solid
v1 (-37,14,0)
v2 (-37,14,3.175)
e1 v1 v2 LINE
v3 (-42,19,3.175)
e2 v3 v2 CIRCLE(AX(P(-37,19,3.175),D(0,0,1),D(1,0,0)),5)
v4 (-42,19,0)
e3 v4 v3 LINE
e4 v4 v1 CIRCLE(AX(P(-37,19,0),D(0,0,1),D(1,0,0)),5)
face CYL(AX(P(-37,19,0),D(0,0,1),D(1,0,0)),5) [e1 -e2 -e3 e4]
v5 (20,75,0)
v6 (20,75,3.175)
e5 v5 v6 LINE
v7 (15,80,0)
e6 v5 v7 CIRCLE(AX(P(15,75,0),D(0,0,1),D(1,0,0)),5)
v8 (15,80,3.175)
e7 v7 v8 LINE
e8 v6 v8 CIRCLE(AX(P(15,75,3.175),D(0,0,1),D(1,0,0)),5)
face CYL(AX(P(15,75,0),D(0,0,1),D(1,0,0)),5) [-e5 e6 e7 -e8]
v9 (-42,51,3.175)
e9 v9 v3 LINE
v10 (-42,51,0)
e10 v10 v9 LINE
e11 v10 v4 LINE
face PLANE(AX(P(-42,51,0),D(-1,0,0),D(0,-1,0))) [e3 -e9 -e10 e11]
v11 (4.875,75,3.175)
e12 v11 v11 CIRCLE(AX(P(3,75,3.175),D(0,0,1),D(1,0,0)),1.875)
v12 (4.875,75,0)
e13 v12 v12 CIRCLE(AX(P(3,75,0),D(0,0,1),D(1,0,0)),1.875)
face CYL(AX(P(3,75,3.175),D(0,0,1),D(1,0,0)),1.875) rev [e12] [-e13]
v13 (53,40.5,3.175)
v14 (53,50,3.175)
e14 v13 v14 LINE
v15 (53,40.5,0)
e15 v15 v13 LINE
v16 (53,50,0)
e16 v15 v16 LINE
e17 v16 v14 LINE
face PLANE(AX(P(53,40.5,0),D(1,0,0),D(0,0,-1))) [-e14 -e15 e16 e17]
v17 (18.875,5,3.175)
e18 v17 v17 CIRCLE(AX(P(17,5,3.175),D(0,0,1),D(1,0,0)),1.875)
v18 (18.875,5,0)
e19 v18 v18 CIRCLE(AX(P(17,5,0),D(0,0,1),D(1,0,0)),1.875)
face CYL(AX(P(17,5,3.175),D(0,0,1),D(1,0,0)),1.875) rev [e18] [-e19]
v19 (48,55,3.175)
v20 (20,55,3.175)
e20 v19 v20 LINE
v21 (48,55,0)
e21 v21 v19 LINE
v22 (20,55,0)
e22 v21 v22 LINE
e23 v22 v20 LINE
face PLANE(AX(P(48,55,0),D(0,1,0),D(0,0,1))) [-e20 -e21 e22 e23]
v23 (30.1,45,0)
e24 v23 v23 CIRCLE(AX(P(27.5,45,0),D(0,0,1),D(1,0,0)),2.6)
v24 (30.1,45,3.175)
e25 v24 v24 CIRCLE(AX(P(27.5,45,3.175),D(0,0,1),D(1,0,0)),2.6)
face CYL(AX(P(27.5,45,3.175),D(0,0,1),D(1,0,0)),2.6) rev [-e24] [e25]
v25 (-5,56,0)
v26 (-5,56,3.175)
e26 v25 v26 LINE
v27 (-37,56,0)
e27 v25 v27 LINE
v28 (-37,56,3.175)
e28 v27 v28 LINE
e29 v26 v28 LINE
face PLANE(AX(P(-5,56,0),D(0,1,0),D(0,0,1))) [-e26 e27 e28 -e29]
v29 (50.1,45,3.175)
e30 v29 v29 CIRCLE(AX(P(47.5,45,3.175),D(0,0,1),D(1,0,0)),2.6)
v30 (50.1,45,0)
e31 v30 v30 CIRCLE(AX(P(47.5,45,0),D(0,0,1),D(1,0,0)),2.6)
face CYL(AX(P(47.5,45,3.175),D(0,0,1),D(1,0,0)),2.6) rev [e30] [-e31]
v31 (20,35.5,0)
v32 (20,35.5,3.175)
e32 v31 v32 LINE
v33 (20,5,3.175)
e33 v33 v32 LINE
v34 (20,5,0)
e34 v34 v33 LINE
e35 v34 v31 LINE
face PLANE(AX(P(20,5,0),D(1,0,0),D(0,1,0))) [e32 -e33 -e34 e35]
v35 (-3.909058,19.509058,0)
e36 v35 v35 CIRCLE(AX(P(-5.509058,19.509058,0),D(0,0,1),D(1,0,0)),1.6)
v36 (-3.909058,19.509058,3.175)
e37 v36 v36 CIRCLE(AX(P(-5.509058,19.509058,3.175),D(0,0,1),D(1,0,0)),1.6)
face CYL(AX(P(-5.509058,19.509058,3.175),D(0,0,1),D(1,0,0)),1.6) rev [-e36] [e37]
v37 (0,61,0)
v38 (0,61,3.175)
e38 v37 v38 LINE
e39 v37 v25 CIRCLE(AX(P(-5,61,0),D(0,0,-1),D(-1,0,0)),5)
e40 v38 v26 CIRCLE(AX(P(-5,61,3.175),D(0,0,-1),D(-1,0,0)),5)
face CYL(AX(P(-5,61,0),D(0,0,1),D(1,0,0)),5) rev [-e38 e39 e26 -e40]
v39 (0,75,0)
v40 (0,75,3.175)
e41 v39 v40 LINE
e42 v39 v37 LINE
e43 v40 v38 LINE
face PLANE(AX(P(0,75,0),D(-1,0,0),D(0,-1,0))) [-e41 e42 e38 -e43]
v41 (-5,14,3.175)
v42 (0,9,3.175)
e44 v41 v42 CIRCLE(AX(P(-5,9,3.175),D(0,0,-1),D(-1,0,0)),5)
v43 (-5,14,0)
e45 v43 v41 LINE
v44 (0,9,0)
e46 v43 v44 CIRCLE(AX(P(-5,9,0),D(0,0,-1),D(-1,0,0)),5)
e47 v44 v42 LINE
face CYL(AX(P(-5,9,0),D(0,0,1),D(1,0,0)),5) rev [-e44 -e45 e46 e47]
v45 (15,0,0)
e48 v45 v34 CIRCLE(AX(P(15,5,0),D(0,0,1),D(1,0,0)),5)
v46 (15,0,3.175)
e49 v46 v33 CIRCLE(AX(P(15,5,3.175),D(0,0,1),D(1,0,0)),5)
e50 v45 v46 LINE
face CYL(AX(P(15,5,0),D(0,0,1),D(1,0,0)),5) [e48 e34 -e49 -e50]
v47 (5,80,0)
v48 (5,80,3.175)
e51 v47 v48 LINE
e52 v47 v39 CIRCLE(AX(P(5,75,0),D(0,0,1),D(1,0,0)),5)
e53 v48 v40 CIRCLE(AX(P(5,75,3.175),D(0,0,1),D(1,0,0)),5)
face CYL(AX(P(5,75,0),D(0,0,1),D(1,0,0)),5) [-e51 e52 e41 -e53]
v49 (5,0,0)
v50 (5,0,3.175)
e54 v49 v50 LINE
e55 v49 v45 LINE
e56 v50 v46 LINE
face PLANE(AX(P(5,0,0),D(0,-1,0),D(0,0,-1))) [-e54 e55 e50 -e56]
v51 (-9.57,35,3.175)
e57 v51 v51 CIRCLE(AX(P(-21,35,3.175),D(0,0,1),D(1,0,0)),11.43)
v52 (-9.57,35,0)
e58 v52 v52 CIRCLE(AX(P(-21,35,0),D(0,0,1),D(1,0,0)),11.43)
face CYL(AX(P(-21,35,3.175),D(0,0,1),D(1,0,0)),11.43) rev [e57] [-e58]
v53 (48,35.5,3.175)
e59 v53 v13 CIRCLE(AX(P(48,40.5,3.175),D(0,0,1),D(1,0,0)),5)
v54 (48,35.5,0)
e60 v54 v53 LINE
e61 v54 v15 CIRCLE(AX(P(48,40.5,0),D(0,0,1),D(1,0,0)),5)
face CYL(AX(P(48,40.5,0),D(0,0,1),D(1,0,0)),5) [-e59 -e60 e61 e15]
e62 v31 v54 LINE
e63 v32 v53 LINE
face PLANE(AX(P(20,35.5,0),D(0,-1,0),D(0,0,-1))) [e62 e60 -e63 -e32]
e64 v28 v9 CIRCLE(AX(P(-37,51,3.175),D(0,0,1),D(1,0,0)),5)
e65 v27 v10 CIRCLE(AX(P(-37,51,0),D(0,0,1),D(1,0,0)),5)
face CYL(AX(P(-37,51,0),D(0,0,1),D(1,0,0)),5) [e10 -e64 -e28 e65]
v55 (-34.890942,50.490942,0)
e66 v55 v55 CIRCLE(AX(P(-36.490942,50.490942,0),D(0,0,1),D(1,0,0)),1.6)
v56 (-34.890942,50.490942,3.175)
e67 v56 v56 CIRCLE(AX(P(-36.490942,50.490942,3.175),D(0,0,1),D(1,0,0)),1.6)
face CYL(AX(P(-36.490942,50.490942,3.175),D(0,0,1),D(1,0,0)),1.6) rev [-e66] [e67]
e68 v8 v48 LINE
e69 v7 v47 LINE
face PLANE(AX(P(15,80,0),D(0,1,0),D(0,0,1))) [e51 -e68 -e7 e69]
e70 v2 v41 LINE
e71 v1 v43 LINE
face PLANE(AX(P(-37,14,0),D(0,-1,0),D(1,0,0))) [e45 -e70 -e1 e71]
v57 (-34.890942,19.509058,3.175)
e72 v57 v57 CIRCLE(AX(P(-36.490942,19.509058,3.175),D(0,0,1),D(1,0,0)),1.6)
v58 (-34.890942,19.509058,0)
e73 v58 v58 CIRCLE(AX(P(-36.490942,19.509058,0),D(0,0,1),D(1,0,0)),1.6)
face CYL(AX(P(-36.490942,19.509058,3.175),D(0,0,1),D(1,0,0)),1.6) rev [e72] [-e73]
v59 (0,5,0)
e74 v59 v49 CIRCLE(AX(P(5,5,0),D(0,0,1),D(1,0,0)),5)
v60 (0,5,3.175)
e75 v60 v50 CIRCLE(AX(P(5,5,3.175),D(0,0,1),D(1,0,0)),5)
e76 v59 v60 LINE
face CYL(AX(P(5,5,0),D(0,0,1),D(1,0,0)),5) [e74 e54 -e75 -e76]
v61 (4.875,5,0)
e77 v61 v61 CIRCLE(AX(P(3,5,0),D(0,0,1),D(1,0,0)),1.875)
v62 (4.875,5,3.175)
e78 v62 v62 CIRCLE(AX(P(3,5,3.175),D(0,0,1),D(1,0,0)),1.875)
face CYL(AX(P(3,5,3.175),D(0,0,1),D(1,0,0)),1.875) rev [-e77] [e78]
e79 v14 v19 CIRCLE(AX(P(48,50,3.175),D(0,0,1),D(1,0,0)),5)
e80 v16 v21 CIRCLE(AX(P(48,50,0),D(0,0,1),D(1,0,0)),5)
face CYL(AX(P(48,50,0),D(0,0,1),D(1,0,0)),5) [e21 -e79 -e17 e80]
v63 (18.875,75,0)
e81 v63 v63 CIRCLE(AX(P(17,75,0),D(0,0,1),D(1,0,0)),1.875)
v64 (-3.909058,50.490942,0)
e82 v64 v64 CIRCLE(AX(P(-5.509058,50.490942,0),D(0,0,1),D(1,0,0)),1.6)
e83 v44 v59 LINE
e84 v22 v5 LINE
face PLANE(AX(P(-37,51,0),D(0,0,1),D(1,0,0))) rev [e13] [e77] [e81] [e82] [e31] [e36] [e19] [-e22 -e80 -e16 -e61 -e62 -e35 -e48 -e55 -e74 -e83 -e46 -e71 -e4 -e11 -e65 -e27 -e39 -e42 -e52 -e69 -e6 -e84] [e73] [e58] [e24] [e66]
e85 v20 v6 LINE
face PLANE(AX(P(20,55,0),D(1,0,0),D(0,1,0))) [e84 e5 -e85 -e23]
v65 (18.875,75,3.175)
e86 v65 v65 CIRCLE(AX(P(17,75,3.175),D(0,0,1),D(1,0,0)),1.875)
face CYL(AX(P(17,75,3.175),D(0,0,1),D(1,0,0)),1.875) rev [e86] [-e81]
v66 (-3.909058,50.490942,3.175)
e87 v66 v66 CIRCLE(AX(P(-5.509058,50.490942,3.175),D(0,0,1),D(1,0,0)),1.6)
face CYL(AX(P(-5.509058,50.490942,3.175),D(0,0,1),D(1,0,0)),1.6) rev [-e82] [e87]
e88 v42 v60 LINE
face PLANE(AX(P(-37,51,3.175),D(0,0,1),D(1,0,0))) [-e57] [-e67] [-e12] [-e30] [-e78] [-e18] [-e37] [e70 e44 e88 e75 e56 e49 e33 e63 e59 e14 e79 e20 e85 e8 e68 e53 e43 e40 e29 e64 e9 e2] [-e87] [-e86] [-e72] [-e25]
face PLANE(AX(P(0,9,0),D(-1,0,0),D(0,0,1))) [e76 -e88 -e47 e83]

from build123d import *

# Parameters (mm, degrees)
BASE_FLANGE1_DEPTH         = 3.175
M3_5_CLEARANCE_HOLE1_D     = 3.75
F_5_2_5_2_DIAMETER_HOLE1_D = 5.2
F_3_2_3_2_DIAMETER_HOLE1_D = 3.2
M20_CLEARANCE_HOLE1_D      = 22.86


# Sheet-metal steps are written as plain solids
with BuildPart() as part:
    # Sketch11 → Base-Flange1 (new body)
    with BuildSketch(Plane.XY.offset(3.175)):
        with BuildLine():
            Line((-42, 51), (-42, 19))
            ThreePointArc((-42, 19), (-40.535533906, 15.464466094), (-37, 14))
            Line((-37, 14), (-5, 14))
            ThreePointArc((-5, 14), (-1.464466094, 12.535533906), (0, 9))
            Line((0, 9), (0, 5))
            ThreePointArc((0, 5), (1.464466094, 1.464466094), (5, 0))
            Line((5, 0), (15, 0))
            ThreePointArc((15, 0), (18.535533906, 1.464466094), (20, 5))
            Line((20, 5), (20, 35.499999523))
            Line((20, 35.499999523), (48, 35.499999523))
            ThreePointArc((48, 35.499999523), (51.535533906, 36.964465617), (53, 40.499999523))
            Line((53, 40.499999523), (53, 50))
            ThreePointArc((53, 50), (51.535533906, 53.535533906), (48, 55))
            Line((48, 55), (20, 55))
            Line((20, 55), (20, 75))
            ThreePointArc((20, 75), (18.535533906, 78.535533906), (15, 80))
            Line((15, 80), (5, 80))
            ThreePointArc((5, 80), (1.464466094, 78.535533906), (0, 75))
            Line((0, 75), (0, 61))
            ThreePointArc((0, 61), (-1.464466094, 57.464466094), (-5, 56))
            Line((-5, 56), (-37, 56))
            ThreePointArc((-37, 56), (-40.535533906, 54.535533906), (-42, 51))
        make_face()
    extrude(amount=-BASE_FLANGE1_DEPTH)

    # M3.5 Clearance Hole1 (through all)
    with Locations(Plane.XY.offset(3.175)):
        with Locations((17, 75), (3, 5), (3, 75), (17, 5)):
            Hole(M3_5_CLEARANCE_HOLE1_D / 2)

    # Ø5.2 (5.2) Diameter Hole1 (through all)
    with Locations(Plane.XY.offset(3.175)):
        with Locations((47.5, 45), (27.5, 45)):
            Hole(F_5_2_5_2_DIAMETER_HOLE1_D / 2)

    # Ø3.2 (3.2) Diameter Hole1 (through all)
    with Locations(Plane.XY.offset(3.175)):
        with Locations((-36.490941809, 50.490941809), (-5.509058191, 50.490941809), (-5.509058191, 19.509058191), (-36.490941809, 19.509058191)):
            Hole(F_3_2_3_2_DIAMETER_HOLE1_D / 2)

    # M20 Clearance Hole1 (through all)
    with Locations(Plane.XY.offset(3.175)):
        with Locations((-21, 35)):
            Hole(M20_CLEARANCE_HOLE1_D / 2)


solid = part.part
